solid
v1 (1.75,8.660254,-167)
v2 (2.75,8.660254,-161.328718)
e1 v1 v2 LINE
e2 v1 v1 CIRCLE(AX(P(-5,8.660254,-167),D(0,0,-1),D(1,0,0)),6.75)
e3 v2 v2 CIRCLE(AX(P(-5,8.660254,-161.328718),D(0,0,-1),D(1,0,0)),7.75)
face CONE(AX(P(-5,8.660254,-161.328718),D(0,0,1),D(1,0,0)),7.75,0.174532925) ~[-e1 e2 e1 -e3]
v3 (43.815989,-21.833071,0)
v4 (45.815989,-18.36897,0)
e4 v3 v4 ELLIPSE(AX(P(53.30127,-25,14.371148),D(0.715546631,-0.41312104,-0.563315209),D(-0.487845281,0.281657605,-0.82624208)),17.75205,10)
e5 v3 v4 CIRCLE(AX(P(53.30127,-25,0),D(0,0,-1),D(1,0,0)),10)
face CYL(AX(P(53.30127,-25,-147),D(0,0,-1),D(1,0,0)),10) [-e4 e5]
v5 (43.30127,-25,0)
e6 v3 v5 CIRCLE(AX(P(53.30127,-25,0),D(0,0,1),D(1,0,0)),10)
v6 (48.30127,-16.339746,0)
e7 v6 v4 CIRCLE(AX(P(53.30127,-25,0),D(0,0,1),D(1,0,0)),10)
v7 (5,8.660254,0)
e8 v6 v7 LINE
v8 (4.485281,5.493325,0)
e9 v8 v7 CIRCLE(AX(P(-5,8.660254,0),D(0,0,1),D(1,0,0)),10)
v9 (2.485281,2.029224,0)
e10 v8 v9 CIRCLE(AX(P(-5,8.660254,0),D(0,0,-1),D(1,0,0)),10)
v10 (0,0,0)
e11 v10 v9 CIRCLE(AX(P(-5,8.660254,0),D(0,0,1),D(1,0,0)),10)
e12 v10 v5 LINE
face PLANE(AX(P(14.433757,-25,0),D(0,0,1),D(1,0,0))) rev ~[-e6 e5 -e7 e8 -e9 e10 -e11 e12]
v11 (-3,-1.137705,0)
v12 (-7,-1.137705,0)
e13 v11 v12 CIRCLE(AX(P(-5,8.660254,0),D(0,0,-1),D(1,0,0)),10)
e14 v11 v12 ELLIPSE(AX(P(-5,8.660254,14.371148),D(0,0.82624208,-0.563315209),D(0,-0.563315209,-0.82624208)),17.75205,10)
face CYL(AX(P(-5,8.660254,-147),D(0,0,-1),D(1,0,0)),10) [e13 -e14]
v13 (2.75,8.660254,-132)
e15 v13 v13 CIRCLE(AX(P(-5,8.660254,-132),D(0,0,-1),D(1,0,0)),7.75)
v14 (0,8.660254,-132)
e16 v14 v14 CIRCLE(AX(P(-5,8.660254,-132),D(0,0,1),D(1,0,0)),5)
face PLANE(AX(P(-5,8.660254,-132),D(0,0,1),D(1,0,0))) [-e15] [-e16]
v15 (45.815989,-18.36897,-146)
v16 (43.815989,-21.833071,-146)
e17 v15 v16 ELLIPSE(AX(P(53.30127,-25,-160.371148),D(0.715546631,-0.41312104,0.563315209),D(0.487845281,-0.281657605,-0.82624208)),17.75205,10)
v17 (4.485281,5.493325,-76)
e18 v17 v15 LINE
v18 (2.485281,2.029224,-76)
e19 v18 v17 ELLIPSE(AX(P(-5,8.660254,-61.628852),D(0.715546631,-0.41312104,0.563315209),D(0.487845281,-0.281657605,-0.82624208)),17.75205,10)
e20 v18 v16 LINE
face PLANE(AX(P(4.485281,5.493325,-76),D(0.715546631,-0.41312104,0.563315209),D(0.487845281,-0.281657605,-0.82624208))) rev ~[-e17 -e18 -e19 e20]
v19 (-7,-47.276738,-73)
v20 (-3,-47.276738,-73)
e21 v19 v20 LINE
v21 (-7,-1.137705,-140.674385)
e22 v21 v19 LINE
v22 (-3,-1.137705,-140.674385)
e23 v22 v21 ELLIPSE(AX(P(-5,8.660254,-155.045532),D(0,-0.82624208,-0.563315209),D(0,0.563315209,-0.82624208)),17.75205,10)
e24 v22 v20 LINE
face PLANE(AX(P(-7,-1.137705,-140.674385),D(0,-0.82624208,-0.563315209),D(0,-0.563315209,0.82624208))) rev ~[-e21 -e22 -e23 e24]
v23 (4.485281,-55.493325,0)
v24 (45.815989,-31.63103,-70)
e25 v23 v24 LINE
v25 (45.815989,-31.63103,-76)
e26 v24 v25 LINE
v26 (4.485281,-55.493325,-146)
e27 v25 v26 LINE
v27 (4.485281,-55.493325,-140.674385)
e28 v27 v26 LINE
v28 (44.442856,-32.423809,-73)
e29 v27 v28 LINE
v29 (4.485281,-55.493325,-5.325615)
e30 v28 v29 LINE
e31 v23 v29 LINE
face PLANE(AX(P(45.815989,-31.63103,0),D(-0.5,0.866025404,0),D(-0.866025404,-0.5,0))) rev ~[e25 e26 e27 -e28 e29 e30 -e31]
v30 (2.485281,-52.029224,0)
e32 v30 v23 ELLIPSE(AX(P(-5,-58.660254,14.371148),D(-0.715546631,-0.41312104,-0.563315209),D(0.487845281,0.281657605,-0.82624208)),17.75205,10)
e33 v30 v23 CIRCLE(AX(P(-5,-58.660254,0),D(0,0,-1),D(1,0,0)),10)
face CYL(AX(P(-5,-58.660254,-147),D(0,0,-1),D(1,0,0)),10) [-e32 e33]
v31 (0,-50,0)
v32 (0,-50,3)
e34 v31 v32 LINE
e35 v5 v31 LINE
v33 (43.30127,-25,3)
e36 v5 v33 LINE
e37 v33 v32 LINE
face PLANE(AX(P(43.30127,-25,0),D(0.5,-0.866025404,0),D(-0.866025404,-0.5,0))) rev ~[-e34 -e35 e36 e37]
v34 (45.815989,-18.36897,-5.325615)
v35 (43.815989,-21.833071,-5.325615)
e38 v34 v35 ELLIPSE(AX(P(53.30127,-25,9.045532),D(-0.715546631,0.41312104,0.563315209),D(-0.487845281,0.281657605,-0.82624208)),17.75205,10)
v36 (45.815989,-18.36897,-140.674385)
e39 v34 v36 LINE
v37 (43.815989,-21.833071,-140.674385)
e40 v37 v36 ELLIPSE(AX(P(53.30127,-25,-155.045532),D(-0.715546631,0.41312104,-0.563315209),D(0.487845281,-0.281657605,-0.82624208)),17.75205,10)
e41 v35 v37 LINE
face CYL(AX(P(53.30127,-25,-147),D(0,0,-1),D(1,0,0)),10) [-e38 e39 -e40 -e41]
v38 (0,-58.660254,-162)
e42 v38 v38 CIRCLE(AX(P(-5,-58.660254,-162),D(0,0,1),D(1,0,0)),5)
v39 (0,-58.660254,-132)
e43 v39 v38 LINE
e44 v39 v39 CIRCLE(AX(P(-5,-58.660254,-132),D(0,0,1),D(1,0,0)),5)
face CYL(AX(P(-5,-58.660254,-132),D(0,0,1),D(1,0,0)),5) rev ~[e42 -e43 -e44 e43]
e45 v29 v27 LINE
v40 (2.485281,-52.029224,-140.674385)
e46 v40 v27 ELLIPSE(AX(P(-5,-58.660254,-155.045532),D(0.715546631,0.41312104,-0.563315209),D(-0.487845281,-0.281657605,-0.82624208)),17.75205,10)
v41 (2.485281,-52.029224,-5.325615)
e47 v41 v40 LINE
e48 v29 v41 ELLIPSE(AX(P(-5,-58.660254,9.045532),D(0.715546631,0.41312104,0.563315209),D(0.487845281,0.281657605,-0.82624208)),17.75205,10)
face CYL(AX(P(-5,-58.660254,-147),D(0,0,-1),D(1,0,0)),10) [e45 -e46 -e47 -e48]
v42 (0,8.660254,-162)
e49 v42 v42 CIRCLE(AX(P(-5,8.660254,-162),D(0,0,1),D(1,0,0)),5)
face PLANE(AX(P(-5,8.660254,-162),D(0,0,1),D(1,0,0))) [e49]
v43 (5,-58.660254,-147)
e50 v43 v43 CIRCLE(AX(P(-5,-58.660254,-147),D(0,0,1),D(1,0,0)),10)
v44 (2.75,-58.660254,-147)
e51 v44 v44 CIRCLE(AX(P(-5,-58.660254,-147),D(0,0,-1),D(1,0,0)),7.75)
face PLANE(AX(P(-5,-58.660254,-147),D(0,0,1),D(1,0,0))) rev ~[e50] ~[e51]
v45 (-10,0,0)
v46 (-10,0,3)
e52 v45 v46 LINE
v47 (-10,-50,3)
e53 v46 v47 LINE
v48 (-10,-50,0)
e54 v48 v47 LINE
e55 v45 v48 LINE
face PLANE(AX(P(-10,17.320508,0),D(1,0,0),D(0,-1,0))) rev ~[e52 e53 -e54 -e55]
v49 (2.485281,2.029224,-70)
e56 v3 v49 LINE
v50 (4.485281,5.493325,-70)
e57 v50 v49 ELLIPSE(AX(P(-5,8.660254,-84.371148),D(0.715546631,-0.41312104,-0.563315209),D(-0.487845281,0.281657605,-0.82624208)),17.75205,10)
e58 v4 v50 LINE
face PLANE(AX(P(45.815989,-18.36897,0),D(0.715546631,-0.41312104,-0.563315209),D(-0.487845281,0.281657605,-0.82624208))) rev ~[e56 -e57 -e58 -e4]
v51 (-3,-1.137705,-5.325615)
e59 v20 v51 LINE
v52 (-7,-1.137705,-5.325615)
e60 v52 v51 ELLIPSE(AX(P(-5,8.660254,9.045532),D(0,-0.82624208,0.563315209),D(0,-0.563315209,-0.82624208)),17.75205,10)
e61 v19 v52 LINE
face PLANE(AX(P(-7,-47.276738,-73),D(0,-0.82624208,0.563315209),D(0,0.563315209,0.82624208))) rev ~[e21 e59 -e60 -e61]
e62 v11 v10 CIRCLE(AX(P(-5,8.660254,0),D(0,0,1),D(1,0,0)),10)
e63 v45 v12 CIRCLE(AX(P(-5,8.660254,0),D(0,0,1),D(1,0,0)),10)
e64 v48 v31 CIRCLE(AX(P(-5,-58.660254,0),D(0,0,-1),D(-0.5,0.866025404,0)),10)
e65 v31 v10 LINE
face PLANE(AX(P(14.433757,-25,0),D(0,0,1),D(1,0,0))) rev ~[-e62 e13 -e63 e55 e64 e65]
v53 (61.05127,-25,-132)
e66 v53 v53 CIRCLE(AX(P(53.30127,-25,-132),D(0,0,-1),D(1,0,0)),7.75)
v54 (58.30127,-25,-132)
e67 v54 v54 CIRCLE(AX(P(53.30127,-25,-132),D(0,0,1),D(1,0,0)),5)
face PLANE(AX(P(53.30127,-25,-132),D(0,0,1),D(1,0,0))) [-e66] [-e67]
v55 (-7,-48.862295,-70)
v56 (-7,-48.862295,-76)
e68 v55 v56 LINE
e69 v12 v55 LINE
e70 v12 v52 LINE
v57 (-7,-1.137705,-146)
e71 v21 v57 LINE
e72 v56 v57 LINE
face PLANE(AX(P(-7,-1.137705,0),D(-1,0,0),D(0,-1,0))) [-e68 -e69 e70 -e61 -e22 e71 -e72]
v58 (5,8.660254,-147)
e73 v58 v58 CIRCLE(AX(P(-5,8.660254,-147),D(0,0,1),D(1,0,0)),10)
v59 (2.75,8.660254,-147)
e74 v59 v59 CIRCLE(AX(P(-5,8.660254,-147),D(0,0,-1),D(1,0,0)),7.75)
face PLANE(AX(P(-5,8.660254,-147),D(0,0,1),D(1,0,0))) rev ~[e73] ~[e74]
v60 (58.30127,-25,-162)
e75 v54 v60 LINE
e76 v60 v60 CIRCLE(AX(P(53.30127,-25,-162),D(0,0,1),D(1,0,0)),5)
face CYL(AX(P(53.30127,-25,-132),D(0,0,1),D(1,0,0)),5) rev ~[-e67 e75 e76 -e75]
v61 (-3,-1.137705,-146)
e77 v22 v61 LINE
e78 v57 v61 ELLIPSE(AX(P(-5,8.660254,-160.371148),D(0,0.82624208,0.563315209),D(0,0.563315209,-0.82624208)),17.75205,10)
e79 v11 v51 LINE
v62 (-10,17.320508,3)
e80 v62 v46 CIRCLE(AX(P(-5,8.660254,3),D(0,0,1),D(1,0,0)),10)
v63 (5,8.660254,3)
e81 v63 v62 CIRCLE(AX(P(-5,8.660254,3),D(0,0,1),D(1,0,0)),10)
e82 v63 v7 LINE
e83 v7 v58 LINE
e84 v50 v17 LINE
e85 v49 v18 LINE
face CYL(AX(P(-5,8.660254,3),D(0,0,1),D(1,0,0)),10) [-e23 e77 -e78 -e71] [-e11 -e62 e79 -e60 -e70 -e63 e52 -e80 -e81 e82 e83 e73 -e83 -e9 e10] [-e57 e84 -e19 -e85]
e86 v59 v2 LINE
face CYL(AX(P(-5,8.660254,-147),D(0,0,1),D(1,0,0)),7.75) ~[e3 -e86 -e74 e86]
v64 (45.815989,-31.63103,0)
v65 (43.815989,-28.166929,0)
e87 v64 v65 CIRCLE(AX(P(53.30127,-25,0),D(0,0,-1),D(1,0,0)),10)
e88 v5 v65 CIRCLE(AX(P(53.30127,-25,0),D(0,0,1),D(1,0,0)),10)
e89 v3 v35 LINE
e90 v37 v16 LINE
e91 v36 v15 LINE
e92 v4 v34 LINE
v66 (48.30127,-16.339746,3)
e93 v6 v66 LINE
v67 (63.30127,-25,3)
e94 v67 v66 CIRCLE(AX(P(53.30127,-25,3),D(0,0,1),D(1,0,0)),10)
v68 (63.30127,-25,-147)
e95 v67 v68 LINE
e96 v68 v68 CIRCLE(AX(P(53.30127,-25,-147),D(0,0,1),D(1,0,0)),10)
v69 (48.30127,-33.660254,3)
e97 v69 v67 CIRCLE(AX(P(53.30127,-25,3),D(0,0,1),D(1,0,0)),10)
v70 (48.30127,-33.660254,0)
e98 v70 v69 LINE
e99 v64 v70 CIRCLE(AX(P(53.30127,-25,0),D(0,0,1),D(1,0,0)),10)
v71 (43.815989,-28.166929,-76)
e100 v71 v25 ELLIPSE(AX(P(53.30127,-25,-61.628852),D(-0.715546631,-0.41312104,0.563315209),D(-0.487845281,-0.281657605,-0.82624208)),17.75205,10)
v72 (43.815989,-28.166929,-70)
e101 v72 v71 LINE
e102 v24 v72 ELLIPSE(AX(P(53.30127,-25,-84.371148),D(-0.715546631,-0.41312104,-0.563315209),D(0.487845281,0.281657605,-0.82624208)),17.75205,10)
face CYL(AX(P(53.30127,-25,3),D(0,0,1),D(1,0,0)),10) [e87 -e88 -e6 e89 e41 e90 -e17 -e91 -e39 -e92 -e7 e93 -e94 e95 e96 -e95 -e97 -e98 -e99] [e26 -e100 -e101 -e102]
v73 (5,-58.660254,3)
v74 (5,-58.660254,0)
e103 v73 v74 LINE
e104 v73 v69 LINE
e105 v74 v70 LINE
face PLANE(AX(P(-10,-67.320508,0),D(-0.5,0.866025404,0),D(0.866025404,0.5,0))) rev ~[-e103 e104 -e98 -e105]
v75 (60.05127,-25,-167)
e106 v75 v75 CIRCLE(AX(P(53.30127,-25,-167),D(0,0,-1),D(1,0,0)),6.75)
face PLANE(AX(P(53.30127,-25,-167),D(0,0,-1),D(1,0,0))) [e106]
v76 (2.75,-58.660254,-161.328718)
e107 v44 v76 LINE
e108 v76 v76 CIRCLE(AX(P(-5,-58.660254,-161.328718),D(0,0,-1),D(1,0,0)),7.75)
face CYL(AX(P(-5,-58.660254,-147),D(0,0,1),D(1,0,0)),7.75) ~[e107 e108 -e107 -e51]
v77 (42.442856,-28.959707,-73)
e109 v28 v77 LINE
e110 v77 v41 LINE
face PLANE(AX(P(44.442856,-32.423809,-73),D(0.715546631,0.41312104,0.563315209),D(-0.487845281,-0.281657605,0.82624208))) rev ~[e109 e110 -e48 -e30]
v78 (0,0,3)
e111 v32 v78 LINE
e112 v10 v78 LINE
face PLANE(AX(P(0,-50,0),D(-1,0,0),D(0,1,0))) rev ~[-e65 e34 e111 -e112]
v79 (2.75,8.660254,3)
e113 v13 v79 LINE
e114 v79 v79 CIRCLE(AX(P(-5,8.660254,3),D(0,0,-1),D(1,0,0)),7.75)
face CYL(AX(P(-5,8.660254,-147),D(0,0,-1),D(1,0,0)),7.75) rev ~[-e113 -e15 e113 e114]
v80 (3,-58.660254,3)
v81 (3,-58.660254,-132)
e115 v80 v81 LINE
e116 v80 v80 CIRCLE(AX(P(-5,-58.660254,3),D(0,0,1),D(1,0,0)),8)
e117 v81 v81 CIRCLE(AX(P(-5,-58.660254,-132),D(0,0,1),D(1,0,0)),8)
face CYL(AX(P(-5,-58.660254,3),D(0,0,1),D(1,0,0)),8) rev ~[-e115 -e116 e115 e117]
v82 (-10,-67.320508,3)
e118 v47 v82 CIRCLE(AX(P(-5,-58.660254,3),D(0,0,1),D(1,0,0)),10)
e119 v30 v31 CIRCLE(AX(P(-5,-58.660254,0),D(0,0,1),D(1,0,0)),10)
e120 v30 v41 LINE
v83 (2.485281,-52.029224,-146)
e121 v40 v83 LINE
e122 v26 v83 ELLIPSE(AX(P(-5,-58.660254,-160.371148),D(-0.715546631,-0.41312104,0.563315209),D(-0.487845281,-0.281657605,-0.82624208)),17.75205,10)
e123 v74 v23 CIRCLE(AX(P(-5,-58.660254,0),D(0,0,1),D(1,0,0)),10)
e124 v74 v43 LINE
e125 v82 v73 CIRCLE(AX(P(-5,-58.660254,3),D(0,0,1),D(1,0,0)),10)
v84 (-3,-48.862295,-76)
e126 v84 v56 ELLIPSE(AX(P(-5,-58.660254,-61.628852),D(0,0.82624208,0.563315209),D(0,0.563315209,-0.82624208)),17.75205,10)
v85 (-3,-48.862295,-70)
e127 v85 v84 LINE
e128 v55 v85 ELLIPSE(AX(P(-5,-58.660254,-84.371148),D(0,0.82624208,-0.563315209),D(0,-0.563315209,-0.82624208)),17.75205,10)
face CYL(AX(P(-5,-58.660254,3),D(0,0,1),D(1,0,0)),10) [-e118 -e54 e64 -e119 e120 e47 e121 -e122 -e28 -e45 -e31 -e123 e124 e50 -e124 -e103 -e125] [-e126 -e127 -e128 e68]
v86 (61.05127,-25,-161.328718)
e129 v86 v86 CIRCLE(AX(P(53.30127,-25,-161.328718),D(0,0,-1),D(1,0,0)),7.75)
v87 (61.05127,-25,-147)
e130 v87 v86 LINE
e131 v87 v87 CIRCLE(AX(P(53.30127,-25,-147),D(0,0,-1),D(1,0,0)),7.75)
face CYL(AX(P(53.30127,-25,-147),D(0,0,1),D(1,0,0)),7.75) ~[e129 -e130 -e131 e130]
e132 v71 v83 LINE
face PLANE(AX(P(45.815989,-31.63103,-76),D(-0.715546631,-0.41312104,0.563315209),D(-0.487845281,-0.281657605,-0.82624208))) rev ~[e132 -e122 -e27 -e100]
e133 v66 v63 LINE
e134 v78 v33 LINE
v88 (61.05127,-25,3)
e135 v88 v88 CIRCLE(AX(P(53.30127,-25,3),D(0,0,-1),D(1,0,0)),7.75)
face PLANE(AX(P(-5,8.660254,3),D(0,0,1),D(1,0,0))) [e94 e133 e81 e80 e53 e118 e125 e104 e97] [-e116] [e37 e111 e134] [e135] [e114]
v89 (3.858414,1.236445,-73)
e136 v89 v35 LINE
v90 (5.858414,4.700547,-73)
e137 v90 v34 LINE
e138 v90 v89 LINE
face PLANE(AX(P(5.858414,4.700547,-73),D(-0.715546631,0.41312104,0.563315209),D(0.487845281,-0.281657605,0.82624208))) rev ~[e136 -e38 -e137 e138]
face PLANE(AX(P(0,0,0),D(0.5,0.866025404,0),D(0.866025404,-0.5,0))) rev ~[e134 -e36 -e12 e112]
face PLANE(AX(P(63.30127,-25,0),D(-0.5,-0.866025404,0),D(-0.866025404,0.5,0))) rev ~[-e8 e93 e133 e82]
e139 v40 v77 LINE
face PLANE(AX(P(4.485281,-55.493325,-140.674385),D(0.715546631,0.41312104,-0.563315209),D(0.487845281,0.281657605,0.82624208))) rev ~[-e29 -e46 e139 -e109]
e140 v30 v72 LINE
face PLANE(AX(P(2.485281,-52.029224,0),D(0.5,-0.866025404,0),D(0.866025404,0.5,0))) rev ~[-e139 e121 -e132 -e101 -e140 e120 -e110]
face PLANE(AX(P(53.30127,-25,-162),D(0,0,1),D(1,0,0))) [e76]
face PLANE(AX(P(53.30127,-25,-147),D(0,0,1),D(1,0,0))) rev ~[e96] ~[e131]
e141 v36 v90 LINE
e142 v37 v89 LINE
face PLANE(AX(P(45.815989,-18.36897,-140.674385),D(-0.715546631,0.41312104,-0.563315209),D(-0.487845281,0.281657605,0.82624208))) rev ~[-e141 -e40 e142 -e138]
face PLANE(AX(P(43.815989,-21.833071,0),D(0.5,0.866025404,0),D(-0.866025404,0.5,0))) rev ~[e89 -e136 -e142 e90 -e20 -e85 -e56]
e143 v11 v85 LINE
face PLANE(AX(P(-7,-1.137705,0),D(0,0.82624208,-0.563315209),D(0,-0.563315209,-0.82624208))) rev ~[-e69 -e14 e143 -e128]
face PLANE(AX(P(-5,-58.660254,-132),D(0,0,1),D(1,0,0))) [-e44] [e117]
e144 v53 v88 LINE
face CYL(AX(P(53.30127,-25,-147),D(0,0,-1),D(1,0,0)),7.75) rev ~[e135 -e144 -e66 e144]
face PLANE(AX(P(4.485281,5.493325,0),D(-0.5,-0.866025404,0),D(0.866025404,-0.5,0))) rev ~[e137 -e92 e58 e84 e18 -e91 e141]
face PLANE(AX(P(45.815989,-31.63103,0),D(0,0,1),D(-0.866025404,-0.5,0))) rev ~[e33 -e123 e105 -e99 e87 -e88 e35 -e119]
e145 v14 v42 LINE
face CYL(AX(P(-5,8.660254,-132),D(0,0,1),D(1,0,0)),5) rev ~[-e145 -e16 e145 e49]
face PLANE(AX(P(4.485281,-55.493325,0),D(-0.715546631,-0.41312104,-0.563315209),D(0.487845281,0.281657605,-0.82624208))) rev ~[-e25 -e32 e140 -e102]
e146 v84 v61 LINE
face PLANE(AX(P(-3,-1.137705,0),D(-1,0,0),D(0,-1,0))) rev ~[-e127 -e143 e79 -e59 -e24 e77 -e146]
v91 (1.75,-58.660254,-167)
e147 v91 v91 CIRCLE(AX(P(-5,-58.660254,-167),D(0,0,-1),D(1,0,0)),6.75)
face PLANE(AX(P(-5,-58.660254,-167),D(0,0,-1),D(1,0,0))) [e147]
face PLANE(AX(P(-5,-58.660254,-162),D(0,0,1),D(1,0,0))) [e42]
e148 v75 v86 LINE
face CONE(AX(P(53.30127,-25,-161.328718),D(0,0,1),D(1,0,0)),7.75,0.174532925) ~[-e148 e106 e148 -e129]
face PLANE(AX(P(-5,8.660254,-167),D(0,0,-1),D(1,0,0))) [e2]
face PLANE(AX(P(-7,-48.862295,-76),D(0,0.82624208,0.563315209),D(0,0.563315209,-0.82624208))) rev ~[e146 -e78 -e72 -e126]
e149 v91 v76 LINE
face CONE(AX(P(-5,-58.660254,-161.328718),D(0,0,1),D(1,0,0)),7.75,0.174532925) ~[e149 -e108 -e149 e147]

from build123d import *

# Parameters (mm, degrees)
F1_DEPTH  = 3
F2_R      = 10
F3_DEPTH  = 150
F4_W      = 4
F4_H      = 47.7245901334
F5_DEPTH  = 146
F7_DEPTH  = 146
F9_DEPTH  = 146
F11_DEPTH = 4
F13_DEPTH = 4
F15_DEPTH = 4
F16_R     = 10
F17_DEPTH = 150
F18_R     = 8
F19_DEPTH = 135
F20_R     = 7.75
F21_DEPTH = 20
F22_SIZE2 = 5.6712818196
F22_SIZE  = 1
F23_R     = 5
F24_DEPTH = 30
F25_R     = 7.75
F26_DEPTH = 20
F27_SIZE2 = 5.6712818196
F27_SIZE  = 1
F28_R     = 5
F29_DEPTH = 30
F30_R     = 7.75
F31_DEPTH = 20
F32_SIZE2 = 5.6712818196
F32_SIZE  = 1
F33_R     = 5
F34_DEPTH = 30
F35_R     = 10
F35_R_2   = 7.75
F36_DEPTH = 150
F37_R     = 10
F37_R_2   = 7.75
F38_DEPTH = 150


# Not quite as in the source:
# - a feature names something its author has since deleted; it is built from what else it names


with BuildPart() as f1:
    # F0 (on Top) → F1 (new body)
    with BuildSketch(Plane.XY):
        Polygon((63.3012701892, -25), (-10, 17.3205080757), (-10, -67.3205080757), align=None)
        Polygon((0, -50), (0, 0), (43.3012701892, -25), align=None, mode=Mode.SUBTRACT)
    extrude(amount=F1_DEPTH)

    # F2 (on face) → F3 (join)
    with BuildSketch(Plane.XY.offset(3)):
        with Locations((-5, 8.6602540378)):
            Circle(F2_R)
        with Locations((53.3012701892, -25)):
            Circle(F2_R)
        with Locations((-5, -58.6602540378)):
            Circle(F2_R)
    extrude(amount=-F3_DEPTH)

    # F4 (on face) → F5 (join)
    with BuildSketch(Plane(origin=(0, 0, 0), x_dir=(1, 0, 0), z_dir=(0, 0, -1))):
        with Locations((-5, 25)):
            Rectangle(F4_W, F4_H)
    extrude(amount=F5_DEPTH)

    # F6 (on face) → F7 (join)
    with BuildSketch(Plane(origin=(0, 0, 0), x_dir=(1, 0, 0), z_dir=(0, 0, -1))):
        Polygon((4.4852813742, -5.4933253598), (45.815988815, 18.3689697069), (43.815988815, 21.833071322), (2.4852813742, -2.0292237447), align=None)
    extrude(amount=F7_DEPTH)

    # F8 (on face) → F9 (join)
    with BuildSketch(Plane(origin=(0, 0, 0), x_dir=(1, 0, 0), z_dir=(0, 0, -1))):
        Polygon((43.815988815, 28.166928678), (45.815988815, 31.6310302931), (4.4852813742, 55.4933253598), (2.4852813742, 52.0292237447), align=None)
    extrude(amount=F9_DEPTH)

    # F10 (on face) → F11 (cut, through all)
    with BuildSketch(Plane(origin=(-7, 0, 0), x_dir=(0, -1, 0), z_dir=(-1, 0, 0))):
        Polygon((48.8622950667, -76), (1.1377049333, -146), (48.8622950667, -146), align=None)
        Polygon((48.8622950667, -70), (48.8622950667, 0), (1.1377049333, 0), align=None)
        Polygon((1.1377049333, -5.3256151295), (1.1377049333, -140.6743848705), (47.2767375115, -73), align=None)
    extrude(amount=-F11_DEPTH, mode=Mode.SUBTRACT)

    # F12 (on face) → F13 (cut, through all)
    with BuildSketch(Plane(origin=(3.5, 6.0621778265, 0), x_dir=(-0.8660254038, 0.5, 0), z_dir=(0.5, 0.8660254038, 0))):
        Polygon((-1.1377049333, -76), (-48.8622950667, -146), (-1.1377049333, -146), align=None)
        Polygon((-1.1377049333, -70), (-1.1377049333, 0), (-48.8622950667, 0), align=None)
        Polygon((-48.8622950667, -5.3256151295), (-48.8622950667, -140.6743848705), (-2.7232624885, -73), align=None)
    extrude(amount=-F13_DEPTH, mode=Mode.SUBTRACT)

    # F14 (on face) → F15 (cut, through all)
    with BuildSketch(Plane(origin=(25.1506350946, -43.5621778265, 0), x_dir=(0.8660254038, 0.5, 0), z_dir=(0.5, -0.8660254038, 0))):
        Polygon((23.8622950667, -76), (-23.8622950667, -146), (23.8622950667, -146), align=None)
        Polygon((23.8622950667, -70), (23.8622950667, 0), (-23.8622950667, 0), align=None)
        Polygon((-23.8622950667, -5.3256151295), (-23.8622950667, -140.6743848705), (22.2767375115, -73), align=None)
    extrude(amount=-F15_DEPTH, mode=Mode.SUBTRACT)

    # F16 (on face) → F17 (join)
    with BuildSketch(Plane(origin=(0, 0, -147), x_dir=(1, 0, 0), z_dir=(0, 0, -1))):
        with Locations((-5, 58.6602540378)):
            Circle(F16_R)
    extrude(amount=-F17_DEPTH)

    # F18 (on face) → F19 (cut)
    with BuildSketch(Plane.XY.offset(3)):
        with Locations((-5, 8.6602540378)):
            Circle(F18_R)
        with Locations((53.3012701892, -25)):
            Circle(F18_R)
        with Locations((-5, -58.6602540378)):
            Circle(F18_R)
    extrude(amount=-F19_DEPTH, mode=Mode.SUBTRACT)

    # F20 (on face) → F21 (join)
    with BuildSketch(Plane(origin=(0, 0, -147), x_dir=(1, 0, 0), z_dir=(0, 0, -1))):
        with Locations((-5, 58.6602540378)):
            Circle(F20_R)
    extrude(amount=F21_DEPTH)

    # F22
    f22_edges = [f1.edges().sort_by_distance(p)[0] for p in [
        (-12.75, -58.660254, -167),
    ]]
    f22_side = f1.faces().sort_by_distance((-5, -58.660254, -167))[0]
    chamfer(f22_edges, length=F22_SIZE, length2=F22_SIZE2, reference=f22_side)

    # F23 (on face) → F24 (cut)
    with BuildSketch(Plane.XY.offset(-132)):
        with Locations((-5, -58.6602540378)):
            Circle(F23_R)
    extrude(amount=-F24_DEPTH, mode=Mode.SUBTRACT)

    # F25 (on face) → F26 (join)
    with BuildSketch(Plane(origin=(0, 0, -147), x_dir=(1, 0, 0), z_dir=(0, 0, -1))):
        with Locations((53.3012701892, 25)):
            Circle(F25_R)
    extrude(amount=F26_DEPTH)

    # F27
    f27_edges = [f1.edges().sort_by_distance(p)[0] for p in [
        (45.55127, -25, -167),
    ]]
    f27_side = f1.faces().sort_by_distance((53.30127, -25, -167))[0]
    chamfer(f27_edges, length=F27_SIZE, length2=F27_SIZE2, reference=f27_side)

    # F28 (on face) → F29 (cut)
    with BuildSketch(Plane.XY.offset(-132)):
        with Locations((53.3012701892, -25)):
            Circle(F28_R)
    extrude(amount=-F29_DEPTH, mode=Mode.SUBTRACT)

    # F30 (on face) → F31 (join)
    with BuildSketch(Plane(origin=(0, 0, -147), x_dir=(1, 0, 0), z_dir=(0, 0, -1))):
        with Locations((-5, -8.6602540378)):
            Circle(F30_R)
    extrude(amount=F31_DEPTH)

    # F32
    f32_edges = [f1.edges().sort_by_distance(p)[0] for p in [
        (-12.75, 8.660254, -167),
    ]]
    f32_side = f1.faces().sort_by_distance((-5, 8.660254, -167))[0]
    chamfer(f32_edges, length=F32_SIZE, length2=F32_SIZE2, reference=f32_side)

    # F33 (on face) → F34 (cut)
    with BuildSketch(Plane.XY.offset(-132)):
        with Locations((-5, 8.6602540378)):
            Circle(F33_R)
    extrude(amount=-F34_DEPTH, mode=Mode.SUBTRACT)

    # F35 (on face) → F36 (join)
    with BuildSketch(Plane(origin=(0, 0, -147), x_dir=(1, 0, 0), z_dir=(0, 0, -1))):
        with Locations((-5, -8.6602540378)):
            Circle(F35_R)
        with Locations((-5, -8.6602540378)):
            Circle(F35_R_2, mode=Mode.SUBTRACT)
    extrude(amount=-F36_DEPTH)

    # F37 (on face) → F38 (join)
    with BuildSketch(Plane(origin=(0, 0, -147), x_dir=(1, 0, 0), z_dir=(0, 0, -1))):
        with Locations((53.3012701892, 25)):
            Circle(F37_R)
        with Locations((53.3012701892, 25)):
            Circle(F37_R_2, mode=Mode.SUBTRACT)
    extrude(amount=-F38_DEPTH)


solid = f1.part
